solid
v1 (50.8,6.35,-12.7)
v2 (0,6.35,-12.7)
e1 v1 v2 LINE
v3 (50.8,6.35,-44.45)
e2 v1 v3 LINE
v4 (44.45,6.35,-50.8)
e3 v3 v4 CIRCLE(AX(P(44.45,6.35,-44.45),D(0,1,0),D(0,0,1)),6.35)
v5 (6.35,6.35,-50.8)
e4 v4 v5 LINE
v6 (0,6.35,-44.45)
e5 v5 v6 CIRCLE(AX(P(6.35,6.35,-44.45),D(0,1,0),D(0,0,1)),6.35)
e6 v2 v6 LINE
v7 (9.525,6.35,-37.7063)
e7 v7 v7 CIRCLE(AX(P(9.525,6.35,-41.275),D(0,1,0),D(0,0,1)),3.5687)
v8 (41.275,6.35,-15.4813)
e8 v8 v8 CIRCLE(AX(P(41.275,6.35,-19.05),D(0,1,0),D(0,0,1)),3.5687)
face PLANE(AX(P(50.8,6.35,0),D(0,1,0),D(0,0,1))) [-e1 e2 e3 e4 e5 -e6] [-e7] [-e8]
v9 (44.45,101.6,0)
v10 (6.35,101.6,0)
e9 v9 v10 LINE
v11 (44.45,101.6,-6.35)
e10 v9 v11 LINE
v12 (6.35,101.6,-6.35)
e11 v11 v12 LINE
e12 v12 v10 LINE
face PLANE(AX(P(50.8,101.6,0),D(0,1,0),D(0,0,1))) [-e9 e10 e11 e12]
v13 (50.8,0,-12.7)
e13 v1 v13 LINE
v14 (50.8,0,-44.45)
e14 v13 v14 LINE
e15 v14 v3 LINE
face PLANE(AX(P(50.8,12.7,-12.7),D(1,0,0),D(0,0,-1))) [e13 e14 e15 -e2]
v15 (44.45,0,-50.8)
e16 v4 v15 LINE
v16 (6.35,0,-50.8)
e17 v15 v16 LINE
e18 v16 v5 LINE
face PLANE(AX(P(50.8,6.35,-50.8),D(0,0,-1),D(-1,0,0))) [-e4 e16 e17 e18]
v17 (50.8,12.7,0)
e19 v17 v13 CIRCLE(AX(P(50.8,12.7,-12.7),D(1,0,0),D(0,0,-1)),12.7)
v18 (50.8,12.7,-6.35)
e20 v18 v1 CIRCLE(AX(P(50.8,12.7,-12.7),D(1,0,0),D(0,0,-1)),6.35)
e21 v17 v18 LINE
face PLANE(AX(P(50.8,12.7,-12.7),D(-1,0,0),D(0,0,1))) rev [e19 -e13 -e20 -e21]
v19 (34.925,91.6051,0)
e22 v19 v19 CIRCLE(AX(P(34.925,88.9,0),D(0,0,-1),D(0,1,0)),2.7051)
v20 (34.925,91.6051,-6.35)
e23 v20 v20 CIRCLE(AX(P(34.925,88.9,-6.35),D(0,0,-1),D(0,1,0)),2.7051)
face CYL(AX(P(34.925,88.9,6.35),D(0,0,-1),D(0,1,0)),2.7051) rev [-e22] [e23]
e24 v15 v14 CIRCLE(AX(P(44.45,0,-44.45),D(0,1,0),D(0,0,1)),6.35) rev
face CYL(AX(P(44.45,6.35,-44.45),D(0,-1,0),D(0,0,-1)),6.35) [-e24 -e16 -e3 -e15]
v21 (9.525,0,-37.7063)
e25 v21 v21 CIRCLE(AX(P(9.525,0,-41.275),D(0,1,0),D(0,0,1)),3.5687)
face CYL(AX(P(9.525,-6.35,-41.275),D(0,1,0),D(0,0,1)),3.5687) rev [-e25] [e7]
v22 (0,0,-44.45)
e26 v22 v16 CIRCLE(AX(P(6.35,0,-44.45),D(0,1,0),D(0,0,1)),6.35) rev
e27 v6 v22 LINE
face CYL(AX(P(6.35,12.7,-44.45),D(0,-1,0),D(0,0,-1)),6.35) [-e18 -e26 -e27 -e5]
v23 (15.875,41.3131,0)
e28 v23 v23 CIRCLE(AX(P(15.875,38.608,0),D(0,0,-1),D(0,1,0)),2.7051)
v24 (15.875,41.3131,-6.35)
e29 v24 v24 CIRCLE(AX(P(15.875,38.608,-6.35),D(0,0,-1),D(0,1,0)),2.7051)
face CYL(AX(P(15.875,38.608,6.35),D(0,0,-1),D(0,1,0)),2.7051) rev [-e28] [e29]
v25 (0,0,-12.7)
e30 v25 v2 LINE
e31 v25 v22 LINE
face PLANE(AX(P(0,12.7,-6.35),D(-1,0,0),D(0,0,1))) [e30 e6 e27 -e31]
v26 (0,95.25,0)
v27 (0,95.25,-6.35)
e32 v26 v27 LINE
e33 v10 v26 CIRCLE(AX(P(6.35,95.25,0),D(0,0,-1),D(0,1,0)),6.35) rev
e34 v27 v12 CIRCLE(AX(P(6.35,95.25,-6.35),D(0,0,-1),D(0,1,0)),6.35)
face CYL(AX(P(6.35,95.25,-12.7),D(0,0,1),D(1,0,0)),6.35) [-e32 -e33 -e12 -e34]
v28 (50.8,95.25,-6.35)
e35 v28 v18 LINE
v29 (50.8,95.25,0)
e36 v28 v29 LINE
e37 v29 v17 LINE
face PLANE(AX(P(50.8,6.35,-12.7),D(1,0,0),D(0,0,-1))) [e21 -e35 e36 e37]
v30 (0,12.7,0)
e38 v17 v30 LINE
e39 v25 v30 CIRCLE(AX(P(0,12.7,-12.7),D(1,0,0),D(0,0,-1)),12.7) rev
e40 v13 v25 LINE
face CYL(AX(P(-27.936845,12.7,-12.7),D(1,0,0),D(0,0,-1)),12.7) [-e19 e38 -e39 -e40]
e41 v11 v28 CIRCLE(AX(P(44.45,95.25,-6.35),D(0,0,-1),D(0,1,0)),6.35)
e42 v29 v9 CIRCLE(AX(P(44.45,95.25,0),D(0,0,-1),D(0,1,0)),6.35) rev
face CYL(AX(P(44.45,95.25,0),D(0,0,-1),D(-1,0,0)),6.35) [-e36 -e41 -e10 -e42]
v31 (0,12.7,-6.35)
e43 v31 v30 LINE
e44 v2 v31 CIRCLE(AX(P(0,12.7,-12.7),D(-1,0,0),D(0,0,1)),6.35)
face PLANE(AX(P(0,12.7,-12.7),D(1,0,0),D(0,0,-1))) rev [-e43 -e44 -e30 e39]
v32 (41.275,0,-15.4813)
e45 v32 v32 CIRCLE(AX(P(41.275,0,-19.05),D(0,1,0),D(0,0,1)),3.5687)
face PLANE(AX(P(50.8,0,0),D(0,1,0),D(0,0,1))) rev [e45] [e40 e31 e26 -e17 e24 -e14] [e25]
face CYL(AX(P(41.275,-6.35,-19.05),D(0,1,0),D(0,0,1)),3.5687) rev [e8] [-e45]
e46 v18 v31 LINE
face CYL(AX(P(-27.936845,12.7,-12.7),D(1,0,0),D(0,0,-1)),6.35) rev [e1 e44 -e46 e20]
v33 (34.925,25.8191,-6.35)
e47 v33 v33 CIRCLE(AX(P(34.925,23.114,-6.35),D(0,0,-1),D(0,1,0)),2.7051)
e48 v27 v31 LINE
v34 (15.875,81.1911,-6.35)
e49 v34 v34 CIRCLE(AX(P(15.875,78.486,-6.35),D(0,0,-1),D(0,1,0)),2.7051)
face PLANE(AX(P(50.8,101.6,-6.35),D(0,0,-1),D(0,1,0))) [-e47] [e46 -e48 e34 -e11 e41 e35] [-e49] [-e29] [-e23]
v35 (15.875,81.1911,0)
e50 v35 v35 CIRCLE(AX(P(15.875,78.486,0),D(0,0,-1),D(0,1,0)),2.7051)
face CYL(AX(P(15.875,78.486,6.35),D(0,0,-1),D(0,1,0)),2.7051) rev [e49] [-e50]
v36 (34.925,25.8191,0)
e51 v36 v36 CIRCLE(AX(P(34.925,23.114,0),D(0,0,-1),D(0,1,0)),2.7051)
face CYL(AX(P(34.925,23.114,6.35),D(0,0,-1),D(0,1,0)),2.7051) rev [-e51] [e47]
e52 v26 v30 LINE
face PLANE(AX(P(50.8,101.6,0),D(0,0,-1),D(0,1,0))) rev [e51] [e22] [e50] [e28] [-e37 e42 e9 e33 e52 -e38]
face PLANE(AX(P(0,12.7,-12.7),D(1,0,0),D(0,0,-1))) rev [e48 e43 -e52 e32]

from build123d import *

# Parameters (mm, degrees)
BASE_FLANGE1_DEPTH  = 50.8
SKETCH3_R           = 2.7051
TAB1_DEPTH          = 6.35
SKETCH3_2_R         = 2.7051
CUT_EXTRUDE1_DEPTH  = 12.7
SKETCH4_R           = 3.5687
CUT_EXTRUDE2_DEPTH  = 12.7
FILLET1_R           = 6.35
UNFOLD1_START       = 6.35
UNFOLD1_OUTLINE_W   = 50.8
UNFOLD1_OUTLINE_H   = 14.961835013
UNFOLD1_DEPTH       = 95.25
UNFOLD1_2_OUTLINE_R = 2.7051
UNFOLD1_2_DEPTH     = 6.35
FOLD1_START         = -1.304798
FOLD1_DEPTH         = 92.466633013
FOLD1_START_2       = -6.35
FOLD1_2_OUTLINE_R   = 2.7051
FOLD1_2_DEPTH       = 0.034797996
FOLD1_START_3       = -12.7
FOLD1_3_OUTLINE_R   = 2.7051
FOLD1_3_DEPTH       = 12.7
FOLD1_4_DEPTH       = 50.8


with BuildPart() as part:
    # Base-Flange1: sheet metal written as solids
    # Sketch1 → Base-Flange1 (new body)
    with BuildSketch(Plane(origin=(0, 0, 0), x_dir=(0, 0, -1), z_dir=(1, 0, 0))):
        with BuildLine():
            Line((0, 101.6), (0, 12.7))
            ThreePointArc((0, 12.7), (3.719743879, 3.719743879), (12.7, 0))
            Line((12.7, 0), (50.8, 0))
            Line((50.8, 0), (50.8, 6.35))
            Line((50.8, 6.35), (12.7, 6.35))
            ThreePointArc((12.7, 6.35), (8.209871939, 8.209871939), (6.35, 12.7))
            Line((6.35, 12.7), (6.35, 101.6))
            Line((6.35, 101.6), (0, 101.6))
        make_face()
    extrude(amount=BASE_FLANGE1_DEPTH)

    # Tab1: sheet metal written as solids
    # Sketch3 → Tab1 (add)
    with BuildSketch(Plane(origin=(0, 0, -6.35), x_dir=(-1, 0, 0), z_dir=(0, 0, -1))):
        with Locations((-34.925, 23.114)):
            Circle(SKETCH3_R)
        with Locations((-34.925, 88.9)):
            Circle(SKETCH3_R)
        with Locations((-15.875, 38.608)):
            Circle(SKETCH3_R)
        with Locations((-15.875, 78.486)):
            Circle(SKETCH3_R)
    extrude(amount=-TAB1_DEPTH)

    # Sketch3<2> → Cut-Extrude1 (cut)
    with BuildSketch(Plane(origin=(0, 0, -6.35), x_dir=(-1, 0, 0), z_dir=(0, 0, -1))):
        with Locations(Location((-34.925, 23.114, 0), (0, 0, 90))):
            Circle(SKETCH3_2_R)
        with Locations(Location((-34.925, 88.9, 0), (0, 0, 90))):
            Circle(SKETCH3_2_R)
        with Locations(Location((-15.875, 38.608, 0), (0, 0, 90))):
            Circle(SKETCH3_2_R)
        with Locations(Location((-15.875, 78.486, 0), (0, 0, 90))):
            Circle(SKETCH3_2_R)
    extrude(amount=-CUT_EXTRUDE1_DEPTH, mode=Mode.SUBTRACT)

    # Sketch4 → Cut-Extrude2 (cut)
    with BuildSketch(Plane(origin=(0, 6.35, 0), x_dir=(-1, 0, 0), z_dir=(0, 1, 0))):
        with Locations(Location((-41.275, -19.05, 0), (0, 0, 90))):
            Circle(SKETCH4_R)
        with Locations(Location((-9.525, -41.275, 0), (0, 0, 90))):
            Circle(SKETCH4_R)
    extrude(amount=-CUT_EXTRUDE2_DEPTH, mode=Mode.SUBTRACT)

    # Fillet1
    fillet1_edges = [part.edges().sort_by_distance(p)[0] for p in [
        (50.8, 101.6, -3.175),
        (0, 101.6, -3.175),
        (50.8, 3.175, -50.8),
        (0, 3.175, -50.8),
    ]]
    fillet(fillet1_edges, radius=FILLET1_R)

    # Unfold1: read off the stored shape, not the designer's step
    # Unfold1 outline → Unfold1 (cut)
    with BuildSketch(Plane(origin=(0, 0, 0), x_dir=(1, 0, 0), z_dir=(0, 1, 0)).offset(UNFOLD1_START)):
        with Locations((25.4, 5.219082494)):
            Rectangle(UNFOLD1_OUTLINE_W, UNFOLD1_OUTLINE_H)
    extrude(amount=UNFOLD1_DEPTH, mode=Mode.SUBTRACT)

    # Unfold1 2 outline → Unfold1 2 (add)
    with BuildSketch(Plane(origin=(0, 0, 0), x_dir=(1, 0, 0), z_dir=(0, 1, 0))):
        with BuildLine():
            ThreePointArc((0, -84.811835013), (1.859871939, -89.301963073), (6.35, -91.161835013))
            Line((6.35, -91.161835013), (44.45, -91.161835013))
            ThreePointArc((44.45, -91.161835013), (48.940128061, -89.301963073), (50.8, -84.811835013))
            Line((50.8, -84.811835013), (50.8, 12.7))
            Line((50.8, 12.7), (0, 12.7))
            Line((0, 12.7), (0, -84.811835013))
        make_face()
        with Locations((15.875, -68.047835013)):
            Circle(UNFOLD1_2_OUTLINE_R, mode=Mode.SUBTRACT)
        with Locations((34.925, -78.461835013)):
            Circle(UNFOLD1_2_OUTLINE_R, mode=Mode.SUBTRACT)
        with Locations((15.875, -28.169835013)):
            Circle(UNFOLD1_2_OUTLINE_R, mode=Mode.SUBTRACT)
        with Locations((34.925, -12.675835013)):
            Circle(UNFOLD1_2_OUTLINE_R, mode=Mode.SUBTRACT)
    extrude(amount=UNFOLD1_2_DEPTH)

    # Fold1: read off the stored shape, not the designer's step
    # Fold1 outline → Fold1 (cut)
    with BuildSketch(Plane.XY.offset(FOLD1_START)):
        Polygon((50.8, 0), (50.8, 6.35), (0, 6.35), (0, 9e-09), align=None)
    extrude(amount=FOLD1_DEPTH, mode=Mode.SUBTRACT)

    # Fold1 2 outline → Fold1 2 (add)
    with BuildSketch(Plane.XY.offset(FOLD1_START_2)):
        with BuildLine():
            Line((50.8, 6.35), (50.8, 95.25))
            ThreePointArc((50.8, 95.25), (48.940128061, 99.740128061), (44.45, 101.6))
            Line((44.45, 101.6), (6.35, 101.6))
            ThreePointArc((6.35, 101.6), (1.859871939, 99.740128061), (0, 95.25))
            Line((0, 95.25), (0, 6.35))
            Line((0, 6.35), (50.8, 6.35))
        make_face()
        with Locations((15.875, 38.608)):
            Circle(FOLD1_2_OUTLINE_R, mode=Mode.SUBTRACT)
        with Locations((34.925, 23.114)):
            Circle(FOLD1_2_OUTLINE_R, mode=Mode.SUBTRACT)
        with Locations((15.875, 78.486)):
            Circle(FOLD1_2_OUTLINE_R, mode=Mode.SUBTRACT)
        with Locations((34.925, 88.9)):
            Circle(FOLD1_2_OUTLINE_R, mode=Mode.SUBTRACT)
    extrude(amount=FOLD1_2_DEPTH)

    # Fold1 3 outline → Fold1 3 (add)
    with BuildSketch(Plane.XY.offset(FOLD1_START_3)):
        with BuildLine():
            Line((50.8, 6.35), (50.8, 95.25))
            ThreePointArc((50.8, 95.25), (48.940128061, 99.740128061), (44.45, 101.6))
            Line((44.45, 101.6), (6.35, 101.6))
            ThreePointArc((6.35, 101.6), (1.859871939, 99.740128061), (0, 95.25))
            Line((0, 95.25), (0, 6.35))
            Line((0, 6.35), (50.8, 6.35))
        make_face()
        with Locations((15.875, 38.608)):
            Circle(FOLD1_3_OUTLINE_R, mode=Mode.SUBTRACT)
        with Locations((34.925, 23.114)):
            Circle(FOLD1_3_OUTLINE_R, mode=Mode.SUBTRACT)
        with Locations((15.875, 78.486)):
            Circle(FOLD1_3_OUTLINE_R, mode=Mode.SUBTRACT)
        with Locations((34.925, 88.9)):
            Circle(FOLD1_3_OUTLINE_R, mode=Mode.SUBTRACT)
    extrude(amount=FOLD1_3_DEPTH)

    # Fold1 4 outline → Fold1 4 (cut)
    with BuildSketch(Plane.YZ):
        with BuildLine():
            ThreePointArc((9e-09, -12.7), (3.719743885, -3.719743885), (12.7, -9e-09))
            Line((12.7, -9e-09), (6.35, 0))
            Line((6.35, 0), (6.35, -1.304798))
            Line((6.35, -1.304798), (0, -1.304798))
            Line((0, -1.304798), (9e-09, -12.7))
        make_face()
        with BuildLine():
            Line((101.6, -6.35), (12.7, -6.350000009))
            ThreePointArc((12.7, -6.350000009), (8.209871946, -8.209871946), (6.350000009, -12.7))
            Line((6.350000009, -12.7), (101.6, -12.7))
            Line((101.6, -12.7), (101.6, -6.35))
        make_face()
    extrude(amount=FOLD1_4_DEPTH, mode=Mode.SUBTRACT)


solid = part.part
